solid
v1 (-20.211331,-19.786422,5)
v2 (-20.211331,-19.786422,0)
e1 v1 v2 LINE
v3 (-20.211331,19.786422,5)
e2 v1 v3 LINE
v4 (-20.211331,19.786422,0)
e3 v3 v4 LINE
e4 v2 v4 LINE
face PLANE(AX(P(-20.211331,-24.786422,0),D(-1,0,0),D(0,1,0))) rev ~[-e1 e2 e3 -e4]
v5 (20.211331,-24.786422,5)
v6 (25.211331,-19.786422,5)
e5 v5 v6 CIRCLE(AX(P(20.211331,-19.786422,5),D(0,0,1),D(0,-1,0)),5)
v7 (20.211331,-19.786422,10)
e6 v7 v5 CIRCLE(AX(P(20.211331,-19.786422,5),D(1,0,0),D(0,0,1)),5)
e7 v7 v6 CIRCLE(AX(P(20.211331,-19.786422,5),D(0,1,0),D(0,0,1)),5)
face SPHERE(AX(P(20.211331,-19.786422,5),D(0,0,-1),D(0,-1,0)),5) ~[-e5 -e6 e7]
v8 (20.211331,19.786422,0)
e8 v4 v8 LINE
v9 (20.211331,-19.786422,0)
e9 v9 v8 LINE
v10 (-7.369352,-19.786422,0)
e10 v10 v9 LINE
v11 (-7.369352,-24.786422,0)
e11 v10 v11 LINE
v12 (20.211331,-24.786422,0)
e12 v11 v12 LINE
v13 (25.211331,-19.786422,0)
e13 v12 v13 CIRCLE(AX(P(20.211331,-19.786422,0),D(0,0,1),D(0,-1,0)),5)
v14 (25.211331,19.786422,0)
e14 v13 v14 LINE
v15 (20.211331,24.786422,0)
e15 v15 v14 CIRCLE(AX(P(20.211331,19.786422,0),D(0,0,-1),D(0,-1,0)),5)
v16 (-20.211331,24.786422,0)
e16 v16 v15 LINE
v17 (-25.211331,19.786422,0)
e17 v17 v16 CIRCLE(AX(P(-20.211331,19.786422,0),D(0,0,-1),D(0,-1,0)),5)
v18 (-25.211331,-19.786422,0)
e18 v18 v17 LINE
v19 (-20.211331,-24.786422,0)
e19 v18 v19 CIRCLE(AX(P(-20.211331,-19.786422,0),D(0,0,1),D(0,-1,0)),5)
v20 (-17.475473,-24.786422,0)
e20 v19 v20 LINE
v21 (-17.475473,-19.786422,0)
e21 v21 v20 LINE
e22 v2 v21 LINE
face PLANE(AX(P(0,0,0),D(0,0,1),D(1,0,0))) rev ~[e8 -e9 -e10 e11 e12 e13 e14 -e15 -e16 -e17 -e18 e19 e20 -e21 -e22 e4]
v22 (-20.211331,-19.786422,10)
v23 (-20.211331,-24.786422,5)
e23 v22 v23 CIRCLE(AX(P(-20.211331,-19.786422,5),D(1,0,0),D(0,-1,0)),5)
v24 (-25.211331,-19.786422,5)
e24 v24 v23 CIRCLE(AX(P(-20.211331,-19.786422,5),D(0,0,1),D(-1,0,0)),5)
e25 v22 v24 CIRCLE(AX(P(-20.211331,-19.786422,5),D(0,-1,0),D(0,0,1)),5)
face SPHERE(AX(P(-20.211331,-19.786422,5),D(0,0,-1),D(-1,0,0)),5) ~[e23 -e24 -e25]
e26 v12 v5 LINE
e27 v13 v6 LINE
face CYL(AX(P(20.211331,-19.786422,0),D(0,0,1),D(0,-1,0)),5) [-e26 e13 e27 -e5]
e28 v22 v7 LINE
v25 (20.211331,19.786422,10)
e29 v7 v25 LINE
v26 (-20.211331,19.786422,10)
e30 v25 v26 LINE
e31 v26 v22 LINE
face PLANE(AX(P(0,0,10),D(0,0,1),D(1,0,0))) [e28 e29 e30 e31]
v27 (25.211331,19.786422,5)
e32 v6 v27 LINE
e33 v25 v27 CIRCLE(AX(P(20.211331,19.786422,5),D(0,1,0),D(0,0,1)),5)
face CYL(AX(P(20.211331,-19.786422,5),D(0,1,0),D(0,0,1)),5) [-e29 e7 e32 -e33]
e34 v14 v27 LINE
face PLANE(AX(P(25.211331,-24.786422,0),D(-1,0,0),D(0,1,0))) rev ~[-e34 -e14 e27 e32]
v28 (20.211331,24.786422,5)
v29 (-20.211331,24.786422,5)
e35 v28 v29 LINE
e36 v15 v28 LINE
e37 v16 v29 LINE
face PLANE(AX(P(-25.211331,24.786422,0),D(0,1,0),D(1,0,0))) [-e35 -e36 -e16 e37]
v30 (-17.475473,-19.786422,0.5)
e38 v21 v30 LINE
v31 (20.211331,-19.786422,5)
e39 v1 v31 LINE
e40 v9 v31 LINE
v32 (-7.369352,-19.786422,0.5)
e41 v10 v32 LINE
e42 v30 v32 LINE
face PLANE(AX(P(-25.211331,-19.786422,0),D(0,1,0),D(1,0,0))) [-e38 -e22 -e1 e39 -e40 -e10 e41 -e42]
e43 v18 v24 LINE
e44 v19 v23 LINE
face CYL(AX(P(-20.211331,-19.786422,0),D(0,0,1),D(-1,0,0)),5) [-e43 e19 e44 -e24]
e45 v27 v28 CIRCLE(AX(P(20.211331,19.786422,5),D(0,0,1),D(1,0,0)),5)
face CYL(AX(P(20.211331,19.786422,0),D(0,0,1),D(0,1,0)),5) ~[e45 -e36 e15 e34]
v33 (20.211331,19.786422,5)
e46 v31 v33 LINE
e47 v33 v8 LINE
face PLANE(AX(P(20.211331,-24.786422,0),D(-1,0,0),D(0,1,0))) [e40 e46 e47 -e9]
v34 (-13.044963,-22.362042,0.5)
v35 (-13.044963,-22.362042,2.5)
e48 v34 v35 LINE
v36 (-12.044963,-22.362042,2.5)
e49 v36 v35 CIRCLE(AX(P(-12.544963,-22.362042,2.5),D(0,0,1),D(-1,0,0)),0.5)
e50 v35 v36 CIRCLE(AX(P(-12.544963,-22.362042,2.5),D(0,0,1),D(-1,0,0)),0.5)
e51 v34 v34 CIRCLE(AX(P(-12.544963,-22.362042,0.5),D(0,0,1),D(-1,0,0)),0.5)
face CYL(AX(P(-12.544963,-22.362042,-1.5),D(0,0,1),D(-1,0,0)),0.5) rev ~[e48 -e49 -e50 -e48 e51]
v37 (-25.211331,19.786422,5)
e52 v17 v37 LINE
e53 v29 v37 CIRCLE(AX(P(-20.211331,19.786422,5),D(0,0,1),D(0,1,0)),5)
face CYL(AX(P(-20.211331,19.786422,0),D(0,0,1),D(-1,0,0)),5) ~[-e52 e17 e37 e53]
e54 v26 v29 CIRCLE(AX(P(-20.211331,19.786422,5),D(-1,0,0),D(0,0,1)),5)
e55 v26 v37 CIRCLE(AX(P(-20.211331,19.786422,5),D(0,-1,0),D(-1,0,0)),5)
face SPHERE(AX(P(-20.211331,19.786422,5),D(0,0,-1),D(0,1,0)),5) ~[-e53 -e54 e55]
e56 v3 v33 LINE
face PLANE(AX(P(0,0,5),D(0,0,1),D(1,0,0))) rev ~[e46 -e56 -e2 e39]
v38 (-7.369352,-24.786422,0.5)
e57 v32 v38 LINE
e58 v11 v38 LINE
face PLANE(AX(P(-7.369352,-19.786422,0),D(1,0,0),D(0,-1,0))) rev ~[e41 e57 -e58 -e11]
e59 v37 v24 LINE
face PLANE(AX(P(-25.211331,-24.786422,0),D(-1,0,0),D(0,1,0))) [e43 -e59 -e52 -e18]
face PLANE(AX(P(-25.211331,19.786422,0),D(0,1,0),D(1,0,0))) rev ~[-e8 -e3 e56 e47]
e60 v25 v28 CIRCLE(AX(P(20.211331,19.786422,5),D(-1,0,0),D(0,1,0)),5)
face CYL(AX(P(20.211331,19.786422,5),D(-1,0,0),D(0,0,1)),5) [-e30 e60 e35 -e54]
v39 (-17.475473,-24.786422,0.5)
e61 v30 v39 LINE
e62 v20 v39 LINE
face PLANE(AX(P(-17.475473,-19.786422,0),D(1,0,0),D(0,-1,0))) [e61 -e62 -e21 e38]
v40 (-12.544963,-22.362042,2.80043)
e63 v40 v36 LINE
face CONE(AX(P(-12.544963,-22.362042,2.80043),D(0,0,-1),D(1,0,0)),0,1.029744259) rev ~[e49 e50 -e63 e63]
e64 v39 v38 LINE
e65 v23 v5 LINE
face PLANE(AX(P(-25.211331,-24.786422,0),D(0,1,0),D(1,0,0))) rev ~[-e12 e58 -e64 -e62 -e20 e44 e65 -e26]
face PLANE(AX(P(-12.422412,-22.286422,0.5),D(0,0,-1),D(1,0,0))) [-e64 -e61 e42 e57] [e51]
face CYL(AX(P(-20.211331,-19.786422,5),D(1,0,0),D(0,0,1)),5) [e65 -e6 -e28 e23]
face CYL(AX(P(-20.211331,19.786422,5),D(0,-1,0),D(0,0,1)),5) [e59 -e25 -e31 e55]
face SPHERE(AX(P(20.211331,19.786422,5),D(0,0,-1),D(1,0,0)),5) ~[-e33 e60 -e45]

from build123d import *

# Parameters (mm, degrees)
F0_W     = 50.4226610065
F0_H     = 49.5728440583
F1_DEPTH = 10
F2_T     = -5
F3_W     = 10.1061211899
F3_H     = 5
F4_DEPTH = 0.5
F7_D     = 1
F7_DEPTH = 2
F7_TIP   = 0.3004303095
F8_R     = 5
F9_R     = 5


# Not quite as in the source:
# - a feature names something its author has since deleted; it is built from what else it names


with BuildPart() as f1:
    # F0 (on Top) → F1 (new body)
    with BuildSketch(Plane.XY):
        Rectangle(F0_W, F0_H)
    extrude(amount=F1_DEPTH)

    # F2
    f2_openings = [f1.faces().sort_by_distance(p)[0] for p in [
        (0, 0, 0),
    ]]
    offset(amount=F2_T, openings=f2_openings)

    # F3 (on face) → F4 (cut)
    with BuildSketch(Plane(origin=(0, 0, 0), x_dir=(1, 0, 0), z_dir=(0, 0, -1))):
        with Locations((-12.4224121682, 22.2864220291)):
            Rectangle(F3_W, F3_H)
    extrude(amount=-F4_DEPTH, mode=Mode.SUBTRACT)

    # F7
    with Locations(Plane(origin=(0, 0, 0.5), x_dir=(1, 0, 0), z_dir=(0, 0, -1))):
        with Locations((-12.5449625775, 22.3620422184)):
            Hole(F7_D / 2, depth=F7_DEPTH)
            with Locations((0, 0, -(F7_DEPTH + F7_TIP / 2))):  # 118° drill point
                Cone(0, F7_D / 2, F7_TIP, mode=Mode.SUBTRACT)

    # F8
    f8_edges = [f1.edges().sort_by_distance(p)[0] for p in [
        (-25.211331, -24.786422, 5),
        (25.211331, -24.786422, 5),
        (25.211331, 24.786422, 5),
        (-25.211331, 24.786422, 5),
    ]]
    fillet(f8_edges, radius=F8_R)

    # F9
    f9_edges = [f1.edges().sort_by_distance(p)[0] for p in [
        (25.211331, 0, 10),
        (23.746864, -23.321956, 10),
        (23.746864, 23.321956, 10),
        (0, -24.786422, 10),
        (0, 24.786422, 10),
        (-23.746864, -23.321956, 10),
        (-23.746864, 23.321956, 10),
        (-25.211331, 0, 10),
    ]]
    fillet(f9_edges, radius=F9_R)


solid = f1.part
